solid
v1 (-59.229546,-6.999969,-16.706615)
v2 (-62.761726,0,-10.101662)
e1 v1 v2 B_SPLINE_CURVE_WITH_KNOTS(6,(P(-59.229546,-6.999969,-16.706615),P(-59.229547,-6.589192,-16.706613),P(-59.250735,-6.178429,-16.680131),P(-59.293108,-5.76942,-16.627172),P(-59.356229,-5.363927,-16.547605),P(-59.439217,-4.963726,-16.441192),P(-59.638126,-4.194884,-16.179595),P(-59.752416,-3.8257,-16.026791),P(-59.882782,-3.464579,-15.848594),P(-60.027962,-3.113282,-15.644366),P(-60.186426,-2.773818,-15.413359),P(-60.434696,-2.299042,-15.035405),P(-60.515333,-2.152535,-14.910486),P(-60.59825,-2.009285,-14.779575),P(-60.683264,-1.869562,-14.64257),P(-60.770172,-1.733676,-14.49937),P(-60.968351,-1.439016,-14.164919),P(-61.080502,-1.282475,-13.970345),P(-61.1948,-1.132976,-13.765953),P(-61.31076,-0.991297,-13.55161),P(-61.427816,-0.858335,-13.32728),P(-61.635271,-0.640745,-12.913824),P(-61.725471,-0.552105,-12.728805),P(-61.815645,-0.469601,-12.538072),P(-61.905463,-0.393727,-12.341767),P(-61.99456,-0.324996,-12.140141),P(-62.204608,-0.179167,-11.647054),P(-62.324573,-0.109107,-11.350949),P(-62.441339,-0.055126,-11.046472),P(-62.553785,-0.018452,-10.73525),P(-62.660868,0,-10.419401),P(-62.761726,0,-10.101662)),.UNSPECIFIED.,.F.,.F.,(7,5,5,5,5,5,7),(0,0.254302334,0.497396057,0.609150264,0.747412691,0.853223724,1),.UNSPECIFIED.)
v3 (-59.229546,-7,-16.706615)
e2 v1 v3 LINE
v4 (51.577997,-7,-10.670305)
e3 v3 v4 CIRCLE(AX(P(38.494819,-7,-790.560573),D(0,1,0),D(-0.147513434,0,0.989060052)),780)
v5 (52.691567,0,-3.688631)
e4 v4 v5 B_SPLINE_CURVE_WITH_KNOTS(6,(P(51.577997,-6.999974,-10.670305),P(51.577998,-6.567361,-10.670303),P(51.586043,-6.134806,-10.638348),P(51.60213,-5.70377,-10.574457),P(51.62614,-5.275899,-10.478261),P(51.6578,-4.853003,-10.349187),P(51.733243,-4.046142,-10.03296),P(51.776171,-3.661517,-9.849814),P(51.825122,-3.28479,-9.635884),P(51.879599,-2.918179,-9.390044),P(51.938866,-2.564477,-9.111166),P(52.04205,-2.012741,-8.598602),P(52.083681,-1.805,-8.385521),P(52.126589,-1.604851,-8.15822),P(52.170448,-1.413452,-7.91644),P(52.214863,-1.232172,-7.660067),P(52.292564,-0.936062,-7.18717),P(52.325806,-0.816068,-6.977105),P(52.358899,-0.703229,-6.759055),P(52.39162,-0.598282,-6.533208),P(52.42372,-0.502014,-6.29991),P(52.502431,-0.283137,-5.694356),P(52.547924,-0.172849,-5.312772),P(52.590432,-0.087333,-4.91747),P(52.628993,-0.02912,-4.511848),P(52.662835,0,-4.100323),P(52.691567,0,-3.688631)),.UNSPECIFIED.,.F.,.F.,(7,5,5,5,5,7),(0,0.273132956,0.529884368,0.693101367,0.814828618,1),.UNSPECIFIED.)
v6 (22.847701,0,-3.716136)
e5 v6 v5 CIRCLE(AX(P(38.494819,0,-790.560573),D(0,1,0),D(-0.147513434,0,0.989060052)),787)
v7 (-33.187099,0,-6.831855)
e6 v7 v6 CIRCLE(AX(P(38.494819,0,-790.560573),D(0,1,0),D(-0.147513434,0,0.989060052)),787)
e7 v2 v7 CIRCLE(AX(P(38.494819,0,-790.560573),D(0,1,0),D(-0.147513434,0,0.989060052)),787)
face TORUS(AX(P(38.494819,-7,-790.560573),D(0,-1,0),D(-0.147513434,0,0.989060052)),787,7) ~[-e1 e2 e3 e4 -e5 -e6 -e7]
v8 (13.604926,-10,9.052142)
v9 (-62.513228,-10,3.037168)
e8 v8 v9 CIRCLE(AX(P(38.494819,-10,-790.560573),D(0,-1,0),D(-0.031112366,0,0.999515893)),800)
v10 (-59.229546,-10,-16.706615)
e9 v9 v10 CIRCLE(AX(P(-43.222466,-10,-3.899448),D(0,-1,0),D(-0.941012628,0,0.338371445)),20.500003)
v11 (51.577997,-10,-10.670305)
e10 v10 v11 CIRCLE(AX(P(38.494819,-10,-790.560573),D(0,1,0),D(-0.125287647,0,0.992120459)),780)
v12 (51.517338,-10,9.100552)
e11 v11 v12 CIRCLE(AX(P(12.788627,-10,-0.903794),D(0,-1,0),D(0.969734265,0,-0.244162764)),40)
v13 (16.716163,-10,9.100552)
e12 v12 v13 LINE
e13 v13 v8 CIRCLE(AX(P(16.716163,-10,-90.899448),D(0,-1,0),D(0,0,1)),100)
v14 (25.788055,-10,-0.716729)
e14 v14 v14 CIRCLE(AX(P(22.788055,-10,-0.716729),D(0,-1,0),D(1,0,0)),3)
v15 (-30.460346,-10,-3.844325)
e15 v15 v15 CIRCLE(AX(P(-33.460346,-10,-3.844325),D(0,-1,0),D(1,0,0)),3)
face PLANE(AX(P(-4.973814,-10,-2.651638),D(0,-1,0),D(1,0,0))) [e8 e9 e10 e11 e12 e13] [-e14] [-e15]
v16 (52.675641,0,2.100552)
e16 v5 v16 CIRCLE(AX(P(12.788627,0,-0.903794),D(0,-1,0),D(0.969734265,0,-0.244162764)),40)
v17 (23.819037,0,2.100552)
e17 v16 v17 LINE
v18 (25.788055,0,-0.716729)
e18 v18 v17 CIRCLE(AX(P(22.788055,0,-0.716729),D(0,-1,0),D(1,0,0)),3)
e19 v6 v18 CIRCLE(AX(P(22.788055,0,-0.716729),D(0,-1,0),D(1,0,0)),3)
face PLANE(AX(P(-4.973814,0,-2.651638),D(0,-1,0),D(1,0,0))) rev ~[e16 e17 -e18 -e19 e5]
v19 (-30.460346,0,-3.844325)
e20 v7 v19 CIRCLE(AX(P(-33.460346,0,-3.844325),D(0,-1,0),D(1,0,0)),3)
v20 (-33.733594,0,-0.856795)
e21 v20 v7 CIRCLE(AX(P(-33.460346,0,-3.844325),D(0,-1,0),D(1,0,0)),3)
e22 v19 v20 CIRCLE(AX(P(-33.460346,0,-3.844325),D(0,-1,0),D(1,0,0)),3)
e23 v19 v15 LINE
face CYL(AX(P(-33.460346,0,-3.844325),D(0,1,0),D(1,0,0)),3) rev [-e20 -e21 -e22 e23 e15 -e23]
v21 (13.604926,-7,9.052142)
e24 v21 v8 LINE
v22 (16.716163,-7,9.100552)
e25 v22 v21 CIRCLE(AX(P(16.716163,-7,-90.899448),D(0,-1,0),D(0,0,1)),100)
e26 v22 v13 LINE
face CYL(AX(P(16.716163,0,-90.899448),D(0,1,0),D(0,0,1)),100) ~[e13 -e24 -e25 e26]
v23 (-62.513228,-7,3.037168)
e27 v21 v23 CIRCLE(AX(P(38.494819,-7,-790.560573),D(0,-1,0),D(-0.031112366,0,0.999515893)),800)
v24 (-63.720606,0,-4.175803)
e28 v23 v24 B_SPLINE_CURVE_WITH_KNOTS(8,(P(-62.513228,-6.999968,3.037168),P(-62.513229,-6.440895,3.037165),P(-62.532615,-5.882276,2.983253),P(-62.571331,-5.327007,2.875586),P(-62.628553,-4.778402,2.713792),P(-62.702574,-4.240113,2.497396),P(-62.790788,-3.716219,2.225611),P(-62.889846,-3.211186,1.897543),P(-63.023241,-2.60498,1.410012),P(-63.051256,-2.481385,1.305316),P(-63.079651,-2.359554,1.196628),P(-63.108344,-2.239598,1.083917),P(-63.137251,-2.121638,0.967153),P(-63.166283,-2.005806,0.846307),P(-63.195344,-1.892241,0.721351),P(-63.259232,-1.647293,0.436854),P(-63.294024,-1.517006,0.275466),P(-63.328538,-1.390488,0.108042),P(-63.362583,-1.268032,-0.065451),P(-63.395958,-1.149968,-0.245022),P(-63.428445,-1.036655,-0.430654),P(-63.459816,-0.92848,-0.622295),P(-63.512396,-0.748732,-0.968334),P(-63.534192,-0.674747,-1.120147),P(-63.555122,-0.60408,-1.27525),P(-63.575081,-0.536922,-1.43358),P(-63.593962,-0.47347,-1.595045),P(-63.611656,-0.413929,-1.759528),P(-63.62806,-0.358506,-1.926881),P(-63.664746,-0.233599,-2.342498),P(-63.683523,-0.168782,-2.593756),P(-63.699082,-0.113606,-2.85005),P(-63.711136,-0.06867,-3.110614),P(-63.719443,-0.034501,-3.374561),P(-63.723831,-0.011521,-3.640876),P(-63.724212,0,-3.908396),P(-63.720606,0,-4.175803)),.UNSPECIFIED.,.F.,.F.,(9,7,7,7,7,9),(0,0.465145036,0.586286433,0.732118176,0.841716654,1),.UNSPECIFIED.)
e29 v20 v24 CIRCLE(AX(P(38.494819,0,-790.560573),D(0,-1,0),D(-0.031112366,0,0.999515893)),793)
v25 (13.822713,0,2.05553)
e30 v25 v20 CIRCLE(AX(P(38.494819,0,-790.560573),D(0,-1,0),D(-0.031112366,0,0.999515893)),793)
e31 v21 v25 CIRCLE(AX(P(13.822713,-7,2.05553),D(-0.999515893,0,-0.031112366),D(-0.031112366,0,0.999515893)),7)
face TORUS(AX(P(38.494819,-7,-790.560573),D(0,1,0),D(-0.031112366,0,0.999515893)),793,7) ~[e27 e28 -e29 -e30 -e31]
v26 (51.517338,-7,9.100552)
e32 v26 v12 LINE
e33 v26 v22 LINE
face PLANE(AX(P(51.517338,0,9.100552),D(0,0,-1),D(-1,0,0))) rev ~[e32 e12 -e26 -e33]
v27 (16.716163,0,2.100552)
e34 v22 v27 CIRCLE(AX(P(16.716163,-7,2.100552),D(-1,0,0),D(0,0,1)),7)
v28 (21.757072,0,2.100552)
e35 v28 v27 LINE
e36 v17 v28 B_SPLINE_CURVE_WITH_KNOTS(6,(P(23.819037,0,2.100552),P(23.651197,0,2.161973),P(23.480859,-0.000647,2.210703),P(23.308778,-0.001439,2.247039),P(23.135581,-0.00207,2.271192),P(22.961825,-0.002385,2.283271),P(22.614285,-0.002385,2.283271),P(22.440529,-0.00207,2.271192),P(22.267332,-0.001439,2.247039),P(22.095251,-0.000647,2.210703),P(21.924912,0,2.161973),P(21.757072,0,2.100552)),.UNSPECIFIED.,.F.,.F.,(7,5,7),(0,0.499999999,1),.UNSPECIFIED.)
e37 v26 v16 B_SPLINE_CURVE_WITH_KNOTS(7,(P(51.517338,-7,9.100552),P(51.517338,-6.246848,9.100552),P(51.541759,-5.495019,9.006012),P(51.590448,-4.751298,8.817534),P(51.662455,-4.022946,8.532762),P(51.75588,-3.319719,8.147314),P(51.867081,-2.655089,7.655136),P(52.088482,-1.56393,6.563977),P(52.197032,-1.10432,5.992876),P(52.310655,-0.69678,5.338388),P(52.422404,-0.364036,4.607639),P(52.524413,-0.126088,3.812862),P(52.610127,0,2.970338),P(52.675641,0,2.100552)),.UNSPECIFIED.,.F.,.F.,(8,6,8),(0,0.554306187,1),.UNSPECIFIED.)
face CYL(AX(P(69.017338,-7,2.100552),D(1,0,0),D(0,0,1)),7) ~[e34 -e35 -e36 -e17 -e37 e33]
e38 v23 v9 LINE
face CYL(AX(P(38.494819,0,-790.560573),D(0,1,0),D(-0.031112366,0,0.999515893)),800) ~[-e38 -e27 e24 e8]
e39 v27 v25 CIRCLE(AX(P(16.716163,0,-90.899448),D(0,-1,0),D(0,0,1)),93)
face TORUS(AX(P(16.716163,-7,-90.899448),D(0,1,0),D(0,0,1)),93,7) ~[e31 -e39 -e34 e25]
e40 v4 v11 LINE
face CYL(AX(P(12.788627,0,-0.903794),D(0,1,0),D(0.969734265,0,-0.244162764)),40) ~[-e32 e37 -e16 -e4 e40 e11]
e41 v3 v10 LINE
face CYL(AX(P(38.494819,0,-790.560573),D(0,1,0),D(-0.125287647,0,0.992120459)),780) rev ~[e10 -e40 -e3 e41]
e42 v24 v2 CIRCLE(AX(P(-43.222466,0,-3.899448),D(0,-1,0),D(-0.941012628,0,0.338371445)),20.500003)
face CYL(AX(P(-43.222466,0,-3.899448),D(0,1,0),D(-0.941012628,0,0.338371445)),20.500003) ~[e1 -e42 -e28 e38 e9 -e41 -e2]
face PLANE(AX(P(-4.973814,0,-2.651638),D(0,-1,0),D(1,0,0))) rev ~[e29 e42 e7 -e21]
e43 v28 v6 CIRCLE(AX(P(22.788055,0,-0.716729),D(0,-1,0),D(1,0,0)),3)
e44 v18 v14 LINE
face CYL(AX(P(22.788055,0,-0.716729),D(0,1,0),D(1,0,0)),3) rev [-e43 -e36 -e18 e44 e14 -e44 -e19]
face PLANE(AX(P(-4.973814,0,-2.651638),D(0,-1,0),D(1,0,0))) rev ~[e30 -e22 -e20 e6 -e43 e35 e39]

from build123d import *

# Parameters (mm, degrees)
F0_R         = 3
F1_DEPTH     = 10
F2_T3_ANGLE  = 6.7239804363
F2_T6_ANGLE  = 10.729424982
F2_T9_DEPTH  = 52.3011751173
F2_T12_ANGLE = 1.7828949869


# Not quite as in the source:
# - a fillet or chamfer that OpenCascade refuses, or shapes differently, is made with other operations: its cross-section is extruded or revolved along the edge and cut away or added


with BuildPart() as f1:
    # F0 (on Front) → F1 (new body)
    with BuildSketch(Plane.XZ):
        with BuildLine():
            ThreePointArc((16.7161625637, 9.1005522793), (15.1603559483, 9.0884488757), (13.604925944, 9.0521415948))
            ThreePointArc((13.604925944, 9.0521415948), (-24.5259537531, 6.9533029462), (-62.5132279063, 3.0371680453))
            ThreePointArc((-62.5132279063, 3.0371680453), (-63.4446975244, -7.2627028514), (-59.2295458713, -16.7066147888))
            ThreePointArc((-59.2295458713, -16.7066147888), (-3.9332598443, -11.7153648591), (51.5779973344, -10.6703047235))
            ThreePointArc((51.5779973344, -10.6703047235), (52.7884384629, -0.7810693697), (51.517337681, 9.1005522793))
            Line((51.517337681, 9.1005522793), (16.7161625637, 9.1005522793))
        make_face()
        with Locations((-33.4603461426, -3.8443253384)):
            Circle(F0_R, mode=Mode.SUBTRACT)
        with Locations((22.7880547631, -0.7167291473)):
            Circle(F0_R, mode=Mode.SUBTRACT)
    extrude(amount=F1_DEPTH)

    # F2: fillet of radius 7 on 4 edges, made by hand


with BuildPart() as f2_tool1:
    # F2_s2 → F2_t3 (revolve)
    with BuildSketch(Plane(origin=(13.8732538603, 0, 0.4318388106), x_dir=(0, 1, 0), z_dir=(0.9995158932, 0, 0.0311123662))):
        with BuildLine():
            ThreePointArc((-7, 8.624477953), (-2.0502525317, 6.5742254213), (0, 1.624477953))
            Line((0, 1.624477953), (0, 8.624477953))
            Line((0, 8.624477953), (-7, 8.624477953))
        make_face()
    revolve(axis=Axis((38.4948189015, 0, -790.5605729296), (0, -1, 0)), revolution_arc=F2_T3_ANGLE)


with BuildPart() as f2_tool4:
    # F2_s5 → F2_t6 (revolve)
    with BuildSketch(Plane(origin=(-77.6853434409, 0, -11.5863862591), x_dir=(0, 1, 0), z_dir=(-0.9890600521, 0, -0.1475134342))):
        with BuildLine():
            ThreePointArc((-7, 7.5903844134), (-2.0502525317, 5.5401318817), (0, 0.5903844134))
            Line((0, 0.5903844134), (0, 7.5903844134))
            Line((0, 7.5903844134), (-7, 7.5903844134))
        make_face()
    revolve(axis=Axis((38.4948189015, 0, -790.5605729293), (0, 1, 0)), revolution_arc=F2_T6_ANGLE)


with BuildPart() as f2_tool7:
    # F2_s8 → F2_t9 (new body)
    with BuildSketch(Plane.YZ.offset(69.017337681)):
        with BuildLine():
            ThreePointArc((-7, 9.1005522793), (-2.0502525317, 7.0502997476), (0, 2.1005522793))
            Line((0, 2.1005522793), (0, 9.1005522793))
            Line((0, 9.1005522793), (-7, 9.1005522793))
        make_face()
    extrude(amount=-F2_T9_DEPTH)


with BuildPart() as f2_tool10:
    # F2_s11 → F2_t12 (revolve)
    with BuildSketch(Plane.YZ.offset(16.7161625637)):
        with BuildLine():
            ThreePointArc((-7, 9.1005522793), (-2.0502525317, 7.0502997476), (0, 2.1005522793))
            Line((0, 2.1005522793), (0, 9.1005522793))
            Line((0, 9.1005522793), (-7, 9.1005522793))
        make_face()
    revolve(axis=Axis((16.7161625637, 0, -90.8994477206), (0, -1, 0)), revolution_arc=F2_T12_ANGLE)


with BuildPart() as f1_1:
    add(f1.part)

    # F2_t13: cut F2_tool1, F2_tool4, F2_tool7, F2_tool10
    add([f2_tool1.part, f2_tool4.part, f2_tool7.part, f2_tool10.part], mode=Mode.SUBTRACT)


solid = f1_1.part
